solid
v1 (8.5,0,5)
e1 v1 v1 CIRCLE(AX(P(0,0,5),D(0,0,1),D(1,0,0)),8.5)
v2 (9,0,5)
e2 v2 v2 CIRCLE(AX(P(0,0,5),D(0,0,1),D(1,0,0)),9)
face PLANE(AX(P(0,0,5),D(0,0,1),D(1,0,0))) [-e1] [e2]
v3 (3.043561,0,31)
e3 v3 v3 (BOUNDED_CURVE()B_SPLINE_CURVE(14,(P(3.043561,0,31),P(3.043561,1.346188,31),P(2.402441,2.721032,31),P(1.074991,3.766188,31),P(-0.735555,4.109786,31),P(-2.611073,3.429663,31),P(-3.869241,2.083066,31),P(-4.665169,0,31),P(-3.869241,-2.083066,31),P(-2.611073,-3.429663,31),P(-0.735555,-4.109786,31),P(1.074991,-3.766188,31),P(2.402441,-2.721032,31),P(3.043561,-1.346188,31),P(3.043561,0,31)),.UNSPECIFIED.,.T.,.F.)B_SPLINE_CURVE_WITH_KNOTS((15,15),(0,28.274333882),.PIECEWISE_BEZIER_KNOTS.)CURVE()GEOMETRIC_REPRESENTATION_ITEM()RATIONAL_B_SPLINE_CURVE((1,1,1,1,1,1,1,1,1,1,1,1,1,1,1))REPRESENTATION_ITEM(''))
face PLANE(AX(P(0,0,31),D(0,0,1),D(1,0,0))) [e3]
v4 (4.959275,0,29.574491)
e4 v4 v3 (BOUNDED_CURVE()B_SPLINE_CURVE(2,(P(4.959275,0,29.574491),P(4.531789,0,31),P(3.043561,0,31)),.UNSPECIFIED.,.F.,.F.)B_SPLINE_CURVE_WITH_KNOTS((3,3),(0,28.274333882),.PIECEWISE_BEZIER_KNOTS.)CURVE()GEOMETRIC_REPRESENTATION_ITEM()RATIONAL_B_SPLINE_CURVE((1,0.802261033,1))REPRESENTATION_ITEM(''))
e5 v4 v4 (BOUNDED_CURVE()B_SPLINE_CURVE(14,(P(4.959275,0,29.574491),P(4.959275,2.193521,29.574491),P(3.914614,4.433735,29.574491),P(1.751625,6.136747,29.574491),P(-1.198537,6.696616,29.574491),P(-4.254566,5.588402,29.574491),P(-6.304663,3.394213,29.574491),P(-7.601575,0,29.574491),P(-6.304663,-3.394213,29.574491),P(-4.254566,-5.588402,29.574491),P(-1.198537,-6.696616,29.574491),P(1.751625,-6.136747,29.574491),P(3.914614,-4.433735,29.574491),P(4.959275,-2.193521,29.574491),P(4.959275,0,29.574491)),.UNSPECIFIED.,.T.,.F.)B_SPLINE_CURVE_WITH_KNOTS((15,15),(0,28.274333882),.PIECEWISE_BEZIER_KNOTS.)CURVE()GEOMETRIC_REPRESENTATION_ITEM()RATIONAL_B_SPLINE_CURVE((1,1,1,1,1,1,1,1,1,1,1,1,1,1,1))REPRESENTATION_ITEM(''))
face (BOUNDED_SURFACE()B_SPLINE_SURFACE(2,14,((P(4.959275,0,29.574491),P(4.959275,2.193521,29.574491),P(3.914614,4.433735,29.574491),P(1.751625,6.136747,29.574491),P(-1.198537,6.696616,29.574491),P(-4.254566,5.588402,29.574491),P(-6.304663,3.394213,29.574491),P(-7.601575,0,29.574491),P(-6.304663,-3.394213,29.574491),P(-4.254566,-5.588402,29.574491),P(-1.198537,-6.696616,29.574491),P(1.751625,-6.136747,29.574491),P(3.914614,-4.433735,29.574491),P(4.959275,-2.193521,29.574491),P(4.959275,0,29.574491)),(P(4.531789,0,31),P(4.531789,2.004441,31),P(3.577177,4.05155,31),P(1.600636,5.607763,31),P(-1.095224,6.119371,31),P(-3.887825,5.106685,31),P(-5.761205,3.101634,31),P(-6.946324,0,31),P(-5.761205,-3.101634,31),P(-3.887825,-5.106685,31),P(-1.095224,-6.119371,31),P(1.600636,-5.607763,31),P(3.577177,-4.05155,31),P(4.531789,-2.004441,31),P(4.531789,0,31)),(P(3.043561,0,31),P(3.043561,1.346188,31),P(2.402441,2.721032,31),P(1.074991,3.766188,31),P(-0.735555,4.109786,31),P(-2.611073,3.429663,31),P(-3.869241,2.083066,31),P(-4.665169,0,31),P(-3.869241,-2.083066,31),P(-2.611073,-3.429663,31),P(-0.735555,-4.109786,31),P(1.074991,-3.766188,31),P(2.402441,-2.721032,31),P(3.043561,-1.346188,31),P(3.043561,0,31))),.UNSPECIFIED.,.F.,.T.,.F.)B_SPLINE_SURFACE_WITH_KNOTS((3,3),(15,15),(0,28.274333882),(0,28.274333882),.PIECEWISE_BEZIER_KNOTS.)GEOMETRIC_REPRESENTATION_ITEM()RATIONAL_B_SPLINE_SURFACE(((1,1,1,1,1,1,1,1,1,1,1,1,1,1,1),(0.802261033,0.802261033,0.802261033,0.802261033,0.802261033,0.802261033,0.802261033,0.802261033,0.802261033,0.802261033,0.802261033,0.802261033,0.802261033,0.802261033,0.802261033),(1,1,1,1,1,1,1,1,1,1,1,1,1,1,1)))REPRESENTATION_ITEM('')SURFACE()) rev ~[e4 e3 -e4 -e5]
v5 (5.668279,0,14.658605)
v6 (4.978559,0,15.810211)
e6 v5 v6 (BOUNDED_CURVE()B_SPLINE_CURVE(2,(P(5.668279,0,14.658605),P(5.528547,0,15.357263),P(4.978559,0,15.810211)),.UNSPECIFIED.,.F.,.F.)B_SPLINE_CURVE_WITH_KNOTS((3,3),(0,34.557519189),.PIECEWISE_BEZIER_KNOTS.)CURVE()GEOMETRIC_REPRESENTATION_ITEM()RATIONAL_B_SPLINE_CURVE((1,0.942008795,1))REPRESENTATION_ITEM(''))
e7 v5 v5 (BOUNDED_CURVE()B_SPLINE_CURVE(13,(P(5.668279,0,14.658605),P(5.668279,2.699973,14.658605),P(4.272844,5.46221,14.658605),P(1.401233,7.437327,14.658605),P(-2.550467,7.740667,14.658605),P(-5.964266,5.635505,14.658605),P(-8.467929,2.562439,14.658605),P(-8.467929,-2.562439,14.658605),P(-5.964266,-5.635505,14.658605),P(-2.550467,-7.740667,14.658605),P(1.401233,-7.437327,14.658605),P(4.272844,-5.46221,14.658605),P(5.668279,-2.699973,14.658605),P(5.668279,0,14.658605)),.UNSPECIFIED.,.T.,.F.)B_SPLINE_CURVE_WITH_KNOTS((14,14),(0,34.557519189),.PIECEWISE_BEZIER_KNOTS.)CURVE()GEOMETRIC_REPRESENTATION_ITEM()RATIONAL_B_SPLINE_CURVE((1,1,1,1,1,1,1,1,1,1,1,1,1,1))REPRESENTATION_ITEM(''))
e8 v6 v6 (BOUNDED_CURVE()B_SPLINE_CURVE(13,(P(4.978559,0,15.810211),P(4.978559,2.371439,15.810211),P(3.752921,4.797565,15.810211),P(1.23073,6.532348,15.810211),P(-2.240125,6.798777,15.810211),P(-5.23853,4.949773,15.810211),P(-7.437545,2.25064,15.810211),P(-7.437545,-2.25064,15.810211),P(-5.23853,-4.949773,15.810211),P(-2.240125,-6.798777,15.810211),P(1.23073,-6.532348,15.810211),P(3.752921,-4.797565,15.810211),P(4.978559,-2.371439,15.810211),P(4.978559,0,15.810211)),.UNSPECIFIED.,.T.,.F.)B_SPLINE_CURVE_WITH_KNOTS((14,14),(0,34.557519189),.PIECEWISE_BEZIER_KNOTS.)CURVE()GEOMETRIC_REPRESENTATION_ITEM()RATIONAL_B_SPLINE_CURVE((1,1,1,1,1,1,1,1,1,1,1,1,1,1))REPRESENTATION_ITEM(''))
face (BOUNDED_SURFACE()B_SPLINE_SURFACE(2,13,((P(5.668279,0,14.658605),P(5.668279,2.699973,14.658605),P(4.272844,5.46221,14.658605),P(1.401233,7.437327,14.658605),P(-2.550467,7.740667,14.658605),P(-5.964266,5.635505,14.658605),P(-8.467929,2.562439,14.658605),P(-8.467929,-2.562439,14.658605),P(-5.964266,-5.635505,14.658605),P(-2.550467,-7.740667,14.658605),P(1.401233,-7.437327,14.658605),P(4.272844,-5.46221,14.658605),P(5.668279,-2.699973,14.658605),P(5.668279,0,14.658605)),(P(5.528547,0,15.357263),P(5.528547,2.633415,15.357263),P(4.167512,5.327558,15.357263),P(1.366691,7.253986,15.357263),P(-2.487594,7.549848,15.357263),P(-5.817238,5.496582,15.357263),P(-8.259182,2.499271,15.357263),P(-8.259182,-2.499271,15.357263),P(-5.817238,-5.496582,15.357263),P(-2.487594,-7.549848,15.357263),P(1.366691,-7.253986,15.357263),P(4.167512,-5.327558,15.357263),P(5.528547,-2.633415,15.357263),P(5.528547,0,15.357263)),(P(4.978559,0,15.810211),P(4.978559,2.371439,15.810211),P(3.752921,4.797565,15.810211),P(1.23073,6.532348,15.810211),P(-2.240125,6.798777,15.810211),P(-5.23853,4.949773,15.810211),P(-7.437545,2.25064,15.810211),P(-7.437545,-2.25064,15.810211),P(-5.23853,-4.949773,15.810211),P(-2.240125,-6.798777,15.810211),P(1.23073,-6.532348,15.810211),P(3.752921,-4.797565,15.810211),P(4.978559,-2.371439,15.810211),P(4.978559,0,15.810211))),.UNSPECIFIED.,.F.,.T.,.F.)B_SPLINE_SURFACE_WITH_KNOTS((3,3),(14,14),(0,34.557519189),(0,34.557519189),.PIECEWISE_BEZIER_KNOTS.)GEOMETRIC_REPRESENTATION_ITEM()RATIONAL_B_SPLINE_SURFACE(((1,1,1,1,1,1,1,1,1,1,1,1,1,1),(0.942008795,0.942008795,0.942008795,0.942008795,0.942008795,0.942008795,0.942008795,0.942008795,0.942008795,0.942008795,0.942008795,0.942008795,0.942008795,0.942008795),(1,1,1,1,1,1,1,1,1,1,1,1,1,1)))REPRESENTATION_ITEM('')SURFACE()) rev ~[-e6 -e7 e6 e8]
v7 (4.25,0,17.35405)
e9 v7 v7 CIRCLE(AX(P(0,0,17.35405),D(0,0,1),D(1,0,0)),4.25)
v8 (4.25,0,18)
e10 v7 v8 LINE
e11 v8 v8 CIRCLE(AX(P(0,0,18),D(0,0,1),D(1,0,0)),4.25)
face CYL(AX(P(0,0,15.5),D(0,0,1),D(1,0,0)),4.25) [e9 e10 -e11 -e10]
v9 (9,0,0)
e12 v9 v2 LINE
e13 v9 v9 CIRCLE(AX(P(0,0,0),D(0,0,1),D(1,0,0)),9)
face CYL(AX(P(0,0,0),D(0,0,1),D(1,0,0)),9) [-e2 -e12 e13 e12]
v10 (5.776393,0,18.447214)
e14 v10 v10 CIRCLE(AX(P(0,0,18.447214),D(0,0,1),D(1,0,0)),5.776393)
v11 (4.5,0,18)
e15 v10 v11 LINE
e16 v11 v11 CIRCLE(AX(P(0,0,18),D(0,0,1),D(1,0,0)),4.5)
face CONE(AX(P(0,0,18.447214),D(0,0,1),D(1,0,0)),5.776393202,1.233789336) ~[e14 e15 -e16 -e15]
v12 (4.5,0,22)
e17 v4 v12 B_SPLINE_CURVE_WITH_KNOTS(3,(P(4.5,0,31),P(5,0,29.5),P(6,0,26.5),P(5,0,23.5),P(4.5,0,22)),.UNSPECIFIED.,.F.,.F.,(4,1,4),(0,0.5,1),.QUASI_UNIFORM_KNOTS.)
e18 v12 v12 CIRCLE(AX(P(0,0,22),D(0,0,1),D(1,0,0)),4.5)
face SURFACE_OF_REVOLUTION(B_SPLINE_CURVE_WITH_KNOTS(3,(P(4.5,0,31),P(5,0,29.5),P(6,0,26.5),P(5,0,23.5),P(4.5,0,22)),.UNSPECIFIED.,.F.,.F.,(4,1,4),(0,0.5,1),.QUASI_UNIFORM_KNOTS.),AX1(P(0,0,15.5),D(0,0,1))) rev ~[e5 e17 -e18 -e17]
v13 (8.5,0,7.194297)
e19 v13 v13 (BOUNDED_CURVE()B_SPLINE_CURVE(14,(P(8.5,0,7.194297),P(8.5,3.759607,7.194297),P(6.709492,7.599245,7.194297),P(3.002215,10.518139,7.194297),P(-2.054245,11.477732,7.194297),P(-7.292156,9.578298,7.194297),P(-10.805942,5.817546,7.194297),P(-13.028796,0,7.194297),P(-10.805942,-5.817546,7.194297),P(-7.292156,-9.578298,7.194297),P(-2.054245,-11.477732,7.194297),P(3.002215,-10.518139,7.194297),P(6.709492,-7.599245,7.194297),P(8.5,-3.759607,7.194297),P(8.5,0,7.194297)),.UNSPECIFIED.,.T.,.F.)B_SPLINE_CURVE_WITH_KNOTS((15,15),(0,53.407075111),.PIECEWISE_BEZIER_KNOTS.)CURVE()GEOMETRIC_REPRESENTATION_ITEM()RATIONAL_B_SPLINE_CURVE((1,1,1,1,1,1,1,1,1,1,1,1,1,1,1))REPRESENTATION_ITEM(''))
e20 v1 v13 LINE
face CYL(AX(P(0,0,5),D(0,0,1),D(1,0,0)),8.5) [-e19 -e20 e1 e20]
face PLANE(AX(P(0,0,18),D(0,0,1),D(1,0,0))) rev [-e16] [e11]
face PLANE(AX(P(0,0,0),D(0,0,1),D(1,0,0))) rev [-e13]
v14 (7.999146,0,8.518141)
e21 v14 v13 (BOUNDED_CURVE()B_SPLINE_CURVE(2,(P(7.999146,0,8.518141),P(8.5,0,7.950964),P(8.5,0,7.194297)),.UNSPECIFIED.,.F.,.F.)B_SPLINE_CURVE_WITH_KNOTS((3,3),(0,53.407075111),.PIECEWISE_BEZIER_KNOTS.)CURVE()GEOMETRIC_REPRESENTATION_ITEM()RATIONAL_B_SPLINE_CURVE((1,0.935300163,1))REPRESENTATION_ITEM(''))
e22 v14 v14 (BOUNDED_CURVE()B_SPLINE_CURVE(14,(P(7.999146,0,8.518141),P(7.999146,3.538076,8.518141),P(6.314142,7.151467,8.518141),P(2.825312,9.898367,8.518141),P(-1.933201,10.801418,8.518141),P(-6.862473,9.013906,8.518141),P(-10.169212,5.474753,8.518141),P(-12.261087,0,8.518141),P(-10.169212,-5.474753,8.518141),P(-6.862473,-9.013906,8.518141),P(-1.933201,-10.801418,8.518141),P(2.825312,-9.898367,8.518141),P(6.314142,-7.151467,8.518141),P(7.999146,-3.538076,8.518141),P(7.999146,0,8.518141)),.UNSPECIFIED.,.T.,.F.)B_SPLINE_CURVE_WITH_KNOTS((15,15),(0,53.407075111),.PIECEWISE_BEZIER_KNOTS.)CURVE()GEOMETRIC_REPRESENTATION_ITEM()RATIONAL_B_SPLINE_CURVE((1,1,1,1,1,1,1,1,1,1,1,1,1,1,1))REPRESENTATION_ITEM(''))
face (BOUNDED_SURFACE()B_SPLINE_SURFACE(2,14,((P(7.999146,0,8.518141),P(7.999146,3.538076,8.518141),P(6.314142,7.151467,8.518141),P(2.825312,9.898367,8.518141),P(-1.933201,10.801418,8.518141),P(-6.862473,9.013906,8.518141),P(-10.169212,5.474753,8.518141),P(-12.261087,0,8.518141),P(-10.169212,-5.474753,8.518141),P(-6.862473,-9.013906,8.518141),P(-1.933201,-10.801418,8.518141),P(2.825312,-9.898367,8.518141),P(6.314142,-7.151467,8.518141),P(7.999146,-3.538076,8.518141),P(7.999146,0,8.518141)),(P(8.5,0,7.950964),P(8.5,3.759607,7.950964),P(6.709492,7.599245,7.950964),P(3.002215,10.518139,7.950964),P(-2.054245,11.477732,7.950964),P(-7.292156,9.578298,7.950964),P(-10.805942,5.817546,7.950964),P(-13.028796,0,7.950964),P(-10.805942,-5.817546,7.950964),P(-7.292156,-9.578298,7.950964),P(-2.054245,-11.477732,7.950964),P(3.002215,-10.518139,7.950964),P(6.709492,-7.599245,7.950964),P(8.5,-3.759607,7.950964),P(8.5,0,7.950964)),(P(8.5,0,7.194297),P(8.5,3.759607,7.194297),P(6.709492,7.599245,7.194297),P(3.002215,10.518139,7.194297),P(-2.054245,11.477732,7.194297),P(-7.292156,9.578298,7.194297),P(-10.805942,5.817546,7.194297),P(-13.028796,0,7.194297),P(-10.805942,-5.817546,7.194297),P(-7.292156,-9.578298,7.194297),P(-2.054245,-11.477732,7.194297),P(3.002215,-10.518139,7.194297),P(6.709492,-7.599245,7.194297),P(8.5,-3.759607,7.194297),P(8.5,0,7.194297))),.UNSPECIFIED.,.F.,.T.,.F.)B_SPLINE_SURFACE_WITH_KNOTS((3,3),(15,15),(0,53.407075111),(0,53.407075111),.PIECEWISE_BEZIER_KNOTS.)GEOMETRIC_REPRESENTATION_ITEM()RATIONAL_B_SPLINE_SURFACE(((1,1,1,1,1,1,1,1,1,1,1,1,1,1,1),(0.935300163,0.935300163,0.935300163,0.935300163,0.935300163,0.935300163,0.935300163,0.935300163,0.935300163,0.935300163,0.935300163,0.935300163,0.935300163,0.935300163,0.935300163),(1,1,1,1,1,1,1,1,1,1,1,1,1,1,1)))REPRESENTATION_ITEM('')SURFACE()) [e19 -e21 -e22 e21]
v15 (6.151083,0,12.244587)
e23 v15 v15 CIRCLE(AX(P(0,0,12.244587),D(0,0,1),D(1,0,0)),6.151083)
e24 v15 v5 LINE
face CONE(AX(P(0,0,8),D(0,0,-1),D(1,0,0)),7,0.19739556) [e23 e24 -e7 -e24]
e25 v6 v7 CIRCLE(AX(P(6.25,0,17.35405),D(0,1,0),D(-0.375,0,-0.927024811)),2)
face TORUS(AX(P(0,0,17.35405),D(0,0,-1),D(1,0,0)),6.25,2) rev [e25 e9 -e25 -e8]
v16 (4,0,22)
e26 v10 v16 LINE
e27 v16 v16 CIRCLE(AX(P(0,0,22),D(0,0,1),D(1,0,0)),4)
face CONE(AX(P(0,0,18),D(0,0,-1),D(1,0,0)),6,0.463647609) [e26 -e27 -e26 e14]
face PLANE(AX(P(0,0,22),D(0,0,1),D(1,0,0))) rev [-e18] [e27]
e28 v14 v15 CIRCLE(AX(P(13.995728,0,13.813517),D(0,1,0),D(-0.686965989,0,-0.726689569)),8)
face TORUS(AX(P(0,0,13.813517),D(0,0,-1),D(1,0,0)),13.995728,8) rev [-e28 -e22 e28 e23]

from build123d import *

# Parameters (mm, degrees)
F4_R = 2
F5_R = 2
F6_R = 2


# Not quite as in the source:
# - a fillet or chamfer that OpenCascade refuses, or shapes differently, is made with other operations: its cross-section is extruded or revolved along the edge and cut away or added


with BuildPart() as f1:
    # F0 (on Front) → F1 (revolve)
    with BuildSketch(Plane.XZ):
        with BuildLine():
            Line((0, 31), (0, 0))
            Line((0, 0), (9, 0))
            Line((9, 0), (9, 5))
            Line((9, 5), (8.5, 5))
            Line((8.5, 5), (8.5, 8))
            Line((8.5, 8), (7, 8))
            Line((7, 8), (5.5, 15.5))
            Line((5.5, 15.5), (4.25, 15.5))
            Line((4.25, 15.5), (4.25, 18))
            Line((4.25, 18), (6, 18))
            Line((6, 18), (4, 22))
            Line((4, 22), (4.5, 22))
            add(Edge.make_bspline(
                [(4.5, 31), (5, 29.5), (6, 26.5), (5, 23.5), (4.5, 22)],
                knots=[0, 0, 0, 0, 0.5, 1, 1, 1, 1], degree=3))
            Line((4.5, 31), (0, 31))
        make_face()
    revolve(axis=Axis((0, 0, 15.5), (0, 0, 1)))

    # F2: fillet of radius 2 on 1 edges, made by hand

    # F2_s1 → F2_t2 (revolve)
    with BuildSketch(Plane.XZ):
        with BuildLine():
            ThreePointArc((5.5, 15.5), (4.5916876048, 16.236015633), (4.25, 17.3540496218))
            Line((4.25, 17.3540496218), (4.25, 15.5))
            Line((4.25, 15.5), (5.5, 15.5))
        make_face()
    revolve(axis=Axis((0, 0, 15.5), (0, 0, 1)))

    # F3: fillet of radius 8 on 1 edges, made by hand

    # F3_s1 → F3_t2 (revolve)
    with BuildSketch(Plane.XZ):
        with BuildLine():
            ThreePointArc((8.5, 8), (6.9960478639, 9.9399549841), (6.1510825053, 12.2445874734))
            Line((6.1510825053, 12.2445874734), (5.9941895972, 12.2132088918))
            Line((5.9941895972, 12.2132088918), (6.8431070919, 7.9686214184))
            Line((6.8431070919, 7.9686214184), (7, 7.84))
            ThreePointArc((7, 7.84), (7.75, 7.84), (8.3900854418, 7.8837296689))
            Line((8.3900854418, 7.8837296689), (8.5, 8))
        make_face()
    revolve(axis=Axis((0, 0, 8), (0, 0, 1)))

    # F4
    f4_edges = [f1.edges().sort_by_distance(p)[0] for p in [
        (-5.5, 0, 15.5),
    ]]
    fillet(f4_edges, radius=F4_R)

    # F5
    f5_edges = [f1.edges().sort_by_distance(p)[0] for p in [
        (-8.5, 0, 8),
    ]]
    fillet(f5_edges, radius=F5_R)

    # F6
    f6_edges = [f1.edges().sort_by_distance(p)[0] for p in [
        (-4.5, 0, 31),
    ]]
    fillet(f6_edges, radius=F6_R)

    # F7: chamfer of 1.5 x 0.5 on 1 edges, made by hand

    # F7_s1 → F7_t2 (revolve, cut)
    with BuildSketch(Plane.XZ):
        Polygon((5.7763932023, 18.4472135955), (4.5, 18), (6, 18), align=None)
    revolve(axis=Axis((0, 0, 18), (0, 0, 1)), mode=Mode.SUBTRACT)


solid = f1.part
